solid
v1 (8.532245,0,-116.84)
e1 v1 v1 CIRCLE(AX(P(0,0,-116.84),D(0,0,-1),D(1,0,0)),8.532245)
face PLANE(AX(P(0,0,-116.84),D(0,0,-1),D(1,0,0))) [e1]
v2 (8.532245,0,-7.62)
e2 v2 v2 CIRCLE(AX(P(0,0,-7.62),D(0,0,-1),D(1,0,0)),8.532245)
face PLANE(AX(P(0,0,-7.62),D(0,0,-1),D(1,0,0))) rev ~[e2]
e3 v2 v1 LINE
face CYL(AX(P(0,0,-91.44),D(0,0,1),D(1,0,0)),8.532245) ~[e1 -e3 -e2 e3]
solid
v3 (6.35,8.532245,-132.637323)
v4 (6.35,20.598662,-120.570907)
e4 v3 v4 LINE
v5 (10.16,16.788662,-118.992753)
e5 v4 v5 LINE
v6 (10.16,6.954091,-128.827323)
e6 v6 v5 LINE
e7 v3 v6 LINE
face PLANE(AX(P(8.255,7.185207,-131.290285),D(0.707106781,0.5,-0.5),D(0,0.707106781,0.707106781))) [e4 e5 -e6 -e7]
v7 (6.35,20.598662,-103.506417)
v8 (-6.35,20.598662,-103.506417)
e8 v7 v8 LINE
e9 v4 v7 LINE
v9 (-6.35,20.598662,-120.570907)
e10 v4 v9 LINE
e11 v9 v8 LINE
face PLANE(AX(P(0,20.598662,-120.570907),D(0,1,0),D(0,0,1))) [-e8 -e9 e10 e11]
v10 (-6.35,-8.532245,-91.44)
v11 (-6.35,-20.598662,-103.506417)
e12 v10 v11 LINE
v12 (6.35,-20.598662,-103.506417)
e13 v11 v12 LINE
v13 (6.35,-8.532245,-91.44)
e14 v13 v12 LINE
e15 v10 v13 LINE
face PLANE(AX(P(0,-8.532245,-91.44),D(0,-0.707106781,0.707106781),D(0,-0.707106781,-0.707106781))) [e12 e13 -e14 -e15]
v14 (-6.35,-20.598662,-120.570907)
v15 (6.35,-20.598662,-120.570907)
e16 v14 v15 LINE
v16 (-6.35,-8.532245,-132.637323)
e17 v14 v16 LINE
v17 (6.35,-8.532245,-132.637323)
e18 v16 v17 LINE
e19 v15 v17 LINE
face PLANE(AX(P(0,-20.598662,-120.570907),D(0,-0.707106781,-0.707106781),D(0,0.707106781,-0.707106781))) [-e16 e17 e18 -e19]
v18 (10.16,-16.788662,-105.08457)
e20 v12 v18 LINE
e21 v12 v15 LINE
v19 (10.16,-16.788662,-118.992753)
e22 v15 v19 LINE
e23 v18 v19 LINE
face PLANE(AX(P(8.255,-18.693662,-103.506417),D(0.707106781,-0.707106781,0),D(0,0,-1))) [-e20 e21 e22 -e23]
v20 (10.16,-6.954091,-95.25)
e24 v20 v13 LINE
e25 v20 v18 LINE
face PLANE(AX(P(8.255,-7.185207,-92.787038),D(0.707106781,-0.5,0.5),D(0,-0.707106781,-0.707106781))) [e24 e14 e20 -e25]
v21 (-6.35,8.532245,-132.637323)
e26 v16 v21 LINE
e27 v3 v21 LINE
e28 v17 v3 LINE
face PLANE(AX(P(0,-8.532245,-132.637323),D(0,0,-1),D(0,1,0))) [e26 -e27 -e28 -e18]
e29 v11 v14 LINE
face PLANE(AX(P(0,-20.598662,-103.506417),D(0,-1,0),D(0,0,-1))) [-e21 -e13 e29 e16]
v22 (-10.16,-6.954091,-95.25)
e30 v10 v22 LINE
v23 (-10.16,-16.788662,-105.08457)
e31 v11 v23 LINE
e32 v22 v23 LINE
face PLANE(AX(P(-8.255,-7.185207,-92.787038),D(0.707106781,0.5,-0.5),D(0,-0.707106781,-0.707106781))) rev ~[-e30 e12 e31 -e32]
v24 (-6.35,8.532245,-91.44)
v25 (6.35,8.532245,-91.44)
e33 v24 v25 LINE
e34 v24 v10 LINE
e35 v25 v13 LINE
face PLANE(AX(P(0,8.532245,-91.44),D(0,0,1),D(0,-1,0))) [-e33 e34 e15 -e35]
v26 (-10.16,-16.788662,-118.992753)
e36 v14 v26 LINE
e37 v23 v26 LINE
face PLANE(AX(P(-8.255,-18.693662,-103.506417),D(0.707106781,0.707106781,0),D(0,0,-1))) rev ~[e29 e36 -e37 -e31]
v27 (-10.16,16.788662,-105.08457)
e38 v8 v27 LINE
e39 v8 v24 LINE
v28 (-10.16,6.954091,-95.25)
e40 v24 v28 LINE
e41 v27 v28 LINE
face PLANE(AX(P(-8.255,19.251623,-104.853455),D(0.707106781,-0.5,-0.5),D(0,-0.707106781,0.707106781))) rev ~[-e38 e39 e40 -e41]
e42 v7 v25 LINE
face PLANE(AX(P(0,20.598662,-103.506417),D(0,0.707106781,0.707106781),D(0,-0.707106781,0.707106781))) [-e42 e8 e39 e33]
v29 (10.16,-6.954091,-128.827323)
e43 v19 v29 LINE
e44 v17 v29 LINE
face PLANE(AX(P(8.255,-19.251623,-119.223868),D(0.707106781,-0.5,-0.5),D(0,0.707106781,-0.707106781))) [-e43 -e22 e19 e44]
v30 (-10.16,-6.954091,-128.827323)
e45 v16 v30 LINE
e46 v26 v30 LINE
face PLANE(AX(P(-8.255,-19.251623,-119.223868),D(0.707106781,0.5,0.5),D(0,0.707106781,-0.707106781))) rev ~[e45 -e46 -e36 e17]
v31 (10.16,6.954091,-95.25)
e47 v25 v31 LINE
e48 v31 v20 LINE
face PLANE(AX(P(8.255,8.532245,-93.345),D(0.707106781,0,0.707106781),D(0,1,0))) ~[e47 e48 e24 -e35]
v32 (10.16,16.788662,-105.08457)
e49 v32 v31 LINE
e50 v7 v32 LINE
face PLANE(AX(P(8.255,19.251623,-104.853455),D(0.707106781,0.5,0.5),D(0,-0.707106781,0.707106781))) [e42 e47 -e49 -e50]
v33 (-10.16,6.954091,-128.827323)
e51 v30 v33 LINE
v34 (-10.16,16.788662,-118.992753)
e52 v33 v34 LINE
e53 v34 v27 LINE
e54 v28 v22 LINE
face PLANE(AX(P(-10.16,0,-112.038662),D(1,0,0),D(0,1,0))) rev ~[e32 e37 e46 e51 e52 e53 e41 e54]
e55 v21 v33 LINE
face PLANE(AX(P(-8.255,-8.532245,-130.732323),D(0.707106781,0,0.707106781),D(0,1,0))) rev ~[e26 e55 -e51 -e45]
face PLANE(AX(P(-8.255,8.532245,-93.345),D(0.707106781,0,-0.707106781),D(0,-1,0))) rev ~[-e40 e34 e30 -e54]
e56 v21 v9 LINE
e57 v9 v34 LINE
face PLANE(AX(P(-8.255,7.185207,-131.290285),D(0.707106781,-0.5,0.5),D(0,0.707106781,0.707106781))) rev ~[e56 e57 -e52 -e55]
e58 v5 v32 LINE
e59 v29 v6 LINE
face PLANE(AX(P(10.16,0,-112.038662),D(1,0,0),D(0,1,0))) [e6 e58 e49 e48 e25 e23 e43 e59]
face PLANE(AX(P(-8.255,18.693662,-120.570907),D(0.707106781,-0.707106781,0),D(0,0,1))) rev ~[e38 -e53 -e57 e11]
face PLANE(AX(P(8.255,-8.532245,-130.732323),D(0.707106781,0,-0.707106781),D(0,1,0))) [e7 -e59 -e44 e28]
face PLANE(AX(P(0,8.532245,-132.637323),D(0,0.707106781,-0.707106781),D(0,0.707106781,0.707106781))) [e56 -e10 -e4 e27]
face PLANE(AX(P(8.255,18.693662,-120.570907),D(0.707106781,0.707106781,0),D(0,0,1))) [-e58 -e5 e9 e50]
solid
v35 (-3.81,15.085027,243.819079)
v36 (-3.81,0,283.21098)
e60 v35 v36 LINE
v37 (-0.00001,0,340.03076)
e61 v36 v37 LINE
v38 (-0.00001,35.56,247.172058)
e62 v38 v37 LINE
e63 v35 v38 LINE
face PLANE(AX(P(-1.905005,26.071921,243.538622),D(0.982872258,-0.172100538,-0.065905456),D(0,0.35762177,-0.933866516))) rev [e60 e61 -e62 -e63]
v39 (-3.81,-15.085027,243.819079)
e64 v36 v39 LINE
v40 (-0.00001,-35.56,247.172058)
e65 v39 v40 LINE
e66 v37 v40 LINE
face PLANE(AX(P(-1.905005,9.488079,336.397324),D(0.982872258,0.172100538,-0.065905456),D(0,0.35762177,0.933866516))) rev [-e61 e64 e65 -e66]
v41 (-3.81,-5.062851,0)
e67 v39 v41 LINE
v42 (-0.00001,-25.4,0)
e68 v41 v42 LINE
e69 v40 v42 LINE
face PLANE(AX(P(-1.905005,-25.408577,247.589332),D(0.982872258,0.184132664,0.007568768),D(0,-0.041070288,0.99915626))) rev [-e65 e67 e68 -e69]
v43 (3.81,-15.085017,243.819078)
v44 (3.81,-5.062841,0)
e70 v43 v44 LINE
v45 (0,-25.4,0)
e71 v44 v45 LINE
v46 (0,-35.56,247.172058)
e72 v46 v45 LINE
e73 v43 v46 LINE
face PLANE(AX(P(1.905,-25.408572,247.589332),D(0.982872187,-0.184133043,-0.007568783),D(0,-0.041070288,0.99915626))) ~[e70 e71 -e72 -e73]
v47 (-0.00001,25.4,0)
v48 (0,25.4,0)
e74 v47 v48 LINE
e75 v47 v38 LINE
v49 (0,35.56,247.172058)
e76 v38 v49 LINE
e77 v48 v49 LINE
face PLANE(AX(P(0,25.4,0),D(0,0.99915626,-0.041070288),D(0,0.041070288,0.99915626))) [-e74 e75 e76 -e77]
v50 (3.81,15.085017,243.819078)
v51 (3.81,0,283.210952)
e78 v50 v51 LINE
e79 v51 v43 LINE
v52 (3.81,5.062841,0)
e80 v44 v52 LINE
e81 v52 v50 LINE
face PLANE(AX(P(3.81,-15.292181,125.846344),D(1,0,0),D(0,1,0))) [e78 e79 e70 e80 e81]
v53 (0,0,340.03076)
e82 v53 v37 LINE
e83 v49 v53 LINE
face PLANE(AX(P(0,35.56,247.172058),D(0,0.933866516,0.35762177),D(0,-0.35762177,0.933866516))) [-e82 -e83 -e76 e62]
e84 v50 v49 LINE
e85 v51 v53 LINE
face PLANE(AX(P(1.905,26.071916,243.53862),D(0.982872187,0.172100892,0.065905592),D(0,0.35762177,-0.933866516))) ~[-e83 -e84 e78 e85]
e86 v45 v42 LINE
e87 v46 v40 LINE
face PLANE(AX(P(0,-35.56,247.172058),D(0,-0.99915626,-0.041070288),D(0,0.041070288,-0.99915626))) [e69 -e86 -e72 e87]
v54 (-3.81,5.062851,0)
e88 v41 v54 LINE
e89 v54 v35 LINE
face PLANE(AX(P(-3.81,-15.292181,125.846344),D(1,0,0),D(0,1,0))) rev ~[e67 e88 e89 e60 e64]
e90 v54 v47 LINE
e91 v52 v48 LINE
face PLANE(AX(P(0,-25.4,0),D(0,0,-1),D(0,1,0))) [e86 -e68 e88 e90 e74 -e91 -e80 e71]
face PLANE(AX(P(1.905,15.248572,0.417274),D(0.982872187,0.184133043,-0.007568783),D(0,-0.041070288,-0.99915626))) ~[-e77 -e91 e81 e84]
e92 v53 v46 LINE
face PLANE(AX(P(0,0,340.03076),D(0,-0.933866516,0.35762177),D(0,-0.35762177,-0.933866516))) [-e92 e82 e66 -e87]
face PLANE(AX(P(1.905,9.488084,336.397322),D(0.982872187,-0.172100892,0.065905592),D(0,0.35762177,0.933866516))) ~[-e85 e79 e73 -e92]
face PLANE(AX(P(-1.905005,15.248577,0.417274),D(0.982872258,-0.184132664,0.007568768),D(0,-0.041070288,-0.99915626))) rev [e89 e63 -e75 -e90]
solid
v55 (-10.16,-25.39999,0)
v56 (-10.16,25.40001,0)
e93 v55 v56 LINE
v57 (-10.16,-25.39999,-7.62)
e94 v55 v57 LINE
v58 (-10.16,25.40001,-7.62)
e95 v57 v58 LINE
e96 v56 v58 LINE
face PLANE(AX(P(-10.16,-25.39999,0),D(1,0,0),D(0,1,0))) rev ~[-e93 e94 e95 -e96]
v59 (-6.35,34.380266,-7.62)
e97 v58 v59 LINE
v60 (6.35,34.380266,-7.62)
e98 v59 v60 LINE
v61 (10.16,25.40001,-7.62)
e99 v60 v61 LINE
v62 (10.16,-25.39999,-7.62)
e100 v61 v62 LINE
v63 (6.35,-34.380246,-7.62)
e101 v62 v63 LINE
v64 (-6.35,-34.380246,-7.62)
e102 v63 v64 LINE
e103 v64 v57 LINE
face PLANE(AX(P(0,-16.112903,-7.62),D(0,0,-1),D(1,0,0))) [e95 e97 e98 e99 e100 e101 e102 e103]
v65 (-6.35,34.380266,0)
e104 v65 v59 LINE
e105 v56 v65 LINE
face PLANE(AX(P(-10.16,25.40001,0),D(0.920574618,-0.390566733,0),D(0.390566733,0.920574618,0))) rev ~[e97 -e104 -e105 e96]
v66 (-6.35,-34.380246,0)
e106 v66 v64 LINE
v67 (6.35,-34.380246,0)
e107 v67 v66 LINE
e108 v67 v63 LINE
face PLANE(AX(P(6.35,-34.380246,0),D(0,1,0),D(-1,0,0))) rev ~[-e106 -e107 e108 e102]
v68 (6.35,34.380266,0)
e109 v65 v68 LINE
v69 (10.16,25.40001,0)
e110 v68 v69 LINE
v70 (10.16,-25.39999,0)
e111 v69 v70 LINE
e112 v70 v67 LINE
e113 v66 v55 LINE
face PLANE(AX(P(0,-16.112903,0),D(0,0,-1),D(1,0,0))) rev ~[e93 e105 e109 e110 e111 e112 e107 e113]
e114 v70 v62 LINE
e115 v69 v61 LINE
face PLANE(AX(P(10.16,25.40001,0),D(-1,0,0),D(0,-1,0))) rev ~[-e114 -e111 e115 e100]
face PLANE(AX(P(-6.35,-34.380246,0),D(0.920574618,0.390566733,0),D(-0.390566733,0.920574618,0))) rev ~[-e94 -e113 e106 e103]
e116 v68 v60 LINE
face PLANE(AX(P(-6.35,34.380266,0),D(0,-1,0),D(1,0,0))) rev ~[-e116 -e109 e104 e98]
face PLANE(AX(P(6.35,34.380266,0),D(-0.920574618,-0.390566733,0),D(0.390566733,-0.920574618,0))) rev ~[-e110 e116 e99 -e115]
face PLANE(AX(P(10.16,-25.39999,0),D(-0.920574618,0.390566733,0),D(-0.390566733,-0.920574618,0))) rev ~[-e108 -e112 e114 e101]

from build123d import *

# Parameters (mm, degrees)
F1_DEPTH  = 3.81
F2_SIZE2  = 3.81
F2_SIZE   = 20.32
F3_SIZE2  = 3.80999
F3_SIZE   = 20.31999
F5_DEPTH  = 7.62
F6_R      = 8.5322450092
F7_DEPTH  = 83.82
F9_R      = 8.5322450092
F10_DEPTH = 25.4
F11_DEPTH = 10.16
F12_SIZE  = 3.81


# Not quite as in the source:
# - a fillet or chamfer is up to 0.001 mm smaller than in the source, because OpenCascade refuses the exact size
# - ends of sketch curves that miss each other by under 0.0002 mm in the source are joined


with BuildPart() as f1:
    # F0 (on Right) → F1 (new body, symmetric)
    with BuildSketch(Plane.YZ):
        Polygon((-25.4, 0), (0, 0), (0, 82.3990235604), (0, 247.1720576286), (-35.56, 247.1720576286), align=None)
        Polygon((0, 82.3990235604), (0, 0), (25.4, 0), (35.56, 247.1720576286), (0, 247.1720576286), align=None)
        Polygon((0, 340.030759573), (0, 247.1720576286), (35.56, 247.1720576286), align=None)
        Polygon((-35.56, 247.1720576286), (0, 247.1720576286), (0, 340.030759573), align=None)
    extrude(amount=F1_DEPTH, both=True)

    # F2
    f2_edges = [f1.edges().sort_by_distance(p)[0] for p in [
        (3.81, -30.48, 123.586029),
        (3.81, -17.78, 293.601409),
        (3.81, 17.78, 293.601409),
        (3.81, 30.48, 123.586029),
    ]]
    f2_side = f1.faces().sort_by_distance((3.81, 0, 156.997019))[0]
    chamfer(f2_edges, length=F2_SIZE, length2=F2_SIZE2, reference=f2_side)

    # F3 (size 20.32 and 3.81 in the source; OpenCascade refuses exactly that, so slightly less here)
    f3_edges = [f1.edges().sort_by_distance(p)[0] for p in [
        (-3.81, -30.48, 123.586029),
        (-3.81, -17.78, 293.601409),
        (-3.81, 30.48, 123.586029),
        (-3.81, 17.78, 293.601409),
    ]]
    f3_side = f1.faces().sort_by_distance((-3.81, 0, 156.997019))[0]
    chamfer(f3_edges, length=F3_SIZE, length2=F3_SIZE2, reference=f3_side)


with BuildPart() as f5:
    # F4 (on face) → F5 (new body)
    with BuildSketch(Plane(origin=(0, 0, 0), x_dir=(1, 0, 0), z_dir=(0, 0, -1))):
        Polygon((6.35, 34.3802462), (-6.35, 34.3802462), (-10.16, 25.3999900789), (-10.16, -9.9211e-06), (0, 0), (10.16, -9.9211e-06), (10.16, 25.3999900789), align=None)
        Polygon((0, 0), (-10.16, -9.9211e-06), (-10.16, -25.4000099211), (-6.35, -34.3802660421), (6.35, -34.3802660421), (10.16, -25.4000099211), (10.16, -9.9211e-06), align=None)
    extrude(amount=F5_DEPTH)


with BuildPart() as f7:
    # F6 (on face) → F7 (new body)
    with BuildSketch(Plane(origin=(0, 0, -7.62), x_dir=(1, 0, 0), z_dir=(0, 0, -1))):
        Circle(F6_R)
    extrude(amount=F7_DEPTH)

    # F9 (on face) → F10 (join)
    with BuildSketch(Plane(origin=(0, 0, -91.44), x_dir=(1, 0, 0), z_dir=(0, 0, -1))):
        Circle(F9_R)
    extrude(amount=F10_DEPTH)


with BuildPart() as f11:
    # F8 (on Right) → F11 (new body, symmetric)
    with BuildSketch(Plane.YZ):
        Polygon((20.5986616187, -103.5064166095), (8.5322450092, -91.44), (0, -91.44), (-8.5322450092, -91.44), (-20.5986616187, -103.5064166095), (-20.5986616187, -120.5709066278), (-8.5322450092, -132.6373232373), (8.5322450092, -132.6373232373), (20.5986616187, -120.5709066278), align=None)
    extrude(amount=F11_DEPTH, both=True)

    # F12
    f12_edges = [f11.edges().sort_by_distance(p)[0] for p in [
        (10.16, 20.598662, -112.038662),
        (10.16, 14.565453, -97.473208),
        (10.16, 0, -91.44),
        (10.16, 14.565453, -126.604115),
        (10.16, 0, -132.637323),
        (10.16, -14.565453, -126.604115),
        (10.16, -14.565453, -97.473208),
        (10.16, -20.598662, -112.038662),
        (-10.16, -20.598662, -112.038662),
        (-10.16, -14.565453, -97.473208),
        (-10.16, -14.565453, -126.604115),
        (-10.16, 0, -132.637323),
        (-10.16, 0, -91.44),
        (-10.16, 14.565453, -97.473208),
        (-10.16, 20.598662, -112.038662),
        (-10.16, 14.565453, -126.604115),
    ]]
    chamfer(f12_edges, length=F12_SIZE)


solid = Compound([f1.part, f5.part, f7.part, f11.part])
